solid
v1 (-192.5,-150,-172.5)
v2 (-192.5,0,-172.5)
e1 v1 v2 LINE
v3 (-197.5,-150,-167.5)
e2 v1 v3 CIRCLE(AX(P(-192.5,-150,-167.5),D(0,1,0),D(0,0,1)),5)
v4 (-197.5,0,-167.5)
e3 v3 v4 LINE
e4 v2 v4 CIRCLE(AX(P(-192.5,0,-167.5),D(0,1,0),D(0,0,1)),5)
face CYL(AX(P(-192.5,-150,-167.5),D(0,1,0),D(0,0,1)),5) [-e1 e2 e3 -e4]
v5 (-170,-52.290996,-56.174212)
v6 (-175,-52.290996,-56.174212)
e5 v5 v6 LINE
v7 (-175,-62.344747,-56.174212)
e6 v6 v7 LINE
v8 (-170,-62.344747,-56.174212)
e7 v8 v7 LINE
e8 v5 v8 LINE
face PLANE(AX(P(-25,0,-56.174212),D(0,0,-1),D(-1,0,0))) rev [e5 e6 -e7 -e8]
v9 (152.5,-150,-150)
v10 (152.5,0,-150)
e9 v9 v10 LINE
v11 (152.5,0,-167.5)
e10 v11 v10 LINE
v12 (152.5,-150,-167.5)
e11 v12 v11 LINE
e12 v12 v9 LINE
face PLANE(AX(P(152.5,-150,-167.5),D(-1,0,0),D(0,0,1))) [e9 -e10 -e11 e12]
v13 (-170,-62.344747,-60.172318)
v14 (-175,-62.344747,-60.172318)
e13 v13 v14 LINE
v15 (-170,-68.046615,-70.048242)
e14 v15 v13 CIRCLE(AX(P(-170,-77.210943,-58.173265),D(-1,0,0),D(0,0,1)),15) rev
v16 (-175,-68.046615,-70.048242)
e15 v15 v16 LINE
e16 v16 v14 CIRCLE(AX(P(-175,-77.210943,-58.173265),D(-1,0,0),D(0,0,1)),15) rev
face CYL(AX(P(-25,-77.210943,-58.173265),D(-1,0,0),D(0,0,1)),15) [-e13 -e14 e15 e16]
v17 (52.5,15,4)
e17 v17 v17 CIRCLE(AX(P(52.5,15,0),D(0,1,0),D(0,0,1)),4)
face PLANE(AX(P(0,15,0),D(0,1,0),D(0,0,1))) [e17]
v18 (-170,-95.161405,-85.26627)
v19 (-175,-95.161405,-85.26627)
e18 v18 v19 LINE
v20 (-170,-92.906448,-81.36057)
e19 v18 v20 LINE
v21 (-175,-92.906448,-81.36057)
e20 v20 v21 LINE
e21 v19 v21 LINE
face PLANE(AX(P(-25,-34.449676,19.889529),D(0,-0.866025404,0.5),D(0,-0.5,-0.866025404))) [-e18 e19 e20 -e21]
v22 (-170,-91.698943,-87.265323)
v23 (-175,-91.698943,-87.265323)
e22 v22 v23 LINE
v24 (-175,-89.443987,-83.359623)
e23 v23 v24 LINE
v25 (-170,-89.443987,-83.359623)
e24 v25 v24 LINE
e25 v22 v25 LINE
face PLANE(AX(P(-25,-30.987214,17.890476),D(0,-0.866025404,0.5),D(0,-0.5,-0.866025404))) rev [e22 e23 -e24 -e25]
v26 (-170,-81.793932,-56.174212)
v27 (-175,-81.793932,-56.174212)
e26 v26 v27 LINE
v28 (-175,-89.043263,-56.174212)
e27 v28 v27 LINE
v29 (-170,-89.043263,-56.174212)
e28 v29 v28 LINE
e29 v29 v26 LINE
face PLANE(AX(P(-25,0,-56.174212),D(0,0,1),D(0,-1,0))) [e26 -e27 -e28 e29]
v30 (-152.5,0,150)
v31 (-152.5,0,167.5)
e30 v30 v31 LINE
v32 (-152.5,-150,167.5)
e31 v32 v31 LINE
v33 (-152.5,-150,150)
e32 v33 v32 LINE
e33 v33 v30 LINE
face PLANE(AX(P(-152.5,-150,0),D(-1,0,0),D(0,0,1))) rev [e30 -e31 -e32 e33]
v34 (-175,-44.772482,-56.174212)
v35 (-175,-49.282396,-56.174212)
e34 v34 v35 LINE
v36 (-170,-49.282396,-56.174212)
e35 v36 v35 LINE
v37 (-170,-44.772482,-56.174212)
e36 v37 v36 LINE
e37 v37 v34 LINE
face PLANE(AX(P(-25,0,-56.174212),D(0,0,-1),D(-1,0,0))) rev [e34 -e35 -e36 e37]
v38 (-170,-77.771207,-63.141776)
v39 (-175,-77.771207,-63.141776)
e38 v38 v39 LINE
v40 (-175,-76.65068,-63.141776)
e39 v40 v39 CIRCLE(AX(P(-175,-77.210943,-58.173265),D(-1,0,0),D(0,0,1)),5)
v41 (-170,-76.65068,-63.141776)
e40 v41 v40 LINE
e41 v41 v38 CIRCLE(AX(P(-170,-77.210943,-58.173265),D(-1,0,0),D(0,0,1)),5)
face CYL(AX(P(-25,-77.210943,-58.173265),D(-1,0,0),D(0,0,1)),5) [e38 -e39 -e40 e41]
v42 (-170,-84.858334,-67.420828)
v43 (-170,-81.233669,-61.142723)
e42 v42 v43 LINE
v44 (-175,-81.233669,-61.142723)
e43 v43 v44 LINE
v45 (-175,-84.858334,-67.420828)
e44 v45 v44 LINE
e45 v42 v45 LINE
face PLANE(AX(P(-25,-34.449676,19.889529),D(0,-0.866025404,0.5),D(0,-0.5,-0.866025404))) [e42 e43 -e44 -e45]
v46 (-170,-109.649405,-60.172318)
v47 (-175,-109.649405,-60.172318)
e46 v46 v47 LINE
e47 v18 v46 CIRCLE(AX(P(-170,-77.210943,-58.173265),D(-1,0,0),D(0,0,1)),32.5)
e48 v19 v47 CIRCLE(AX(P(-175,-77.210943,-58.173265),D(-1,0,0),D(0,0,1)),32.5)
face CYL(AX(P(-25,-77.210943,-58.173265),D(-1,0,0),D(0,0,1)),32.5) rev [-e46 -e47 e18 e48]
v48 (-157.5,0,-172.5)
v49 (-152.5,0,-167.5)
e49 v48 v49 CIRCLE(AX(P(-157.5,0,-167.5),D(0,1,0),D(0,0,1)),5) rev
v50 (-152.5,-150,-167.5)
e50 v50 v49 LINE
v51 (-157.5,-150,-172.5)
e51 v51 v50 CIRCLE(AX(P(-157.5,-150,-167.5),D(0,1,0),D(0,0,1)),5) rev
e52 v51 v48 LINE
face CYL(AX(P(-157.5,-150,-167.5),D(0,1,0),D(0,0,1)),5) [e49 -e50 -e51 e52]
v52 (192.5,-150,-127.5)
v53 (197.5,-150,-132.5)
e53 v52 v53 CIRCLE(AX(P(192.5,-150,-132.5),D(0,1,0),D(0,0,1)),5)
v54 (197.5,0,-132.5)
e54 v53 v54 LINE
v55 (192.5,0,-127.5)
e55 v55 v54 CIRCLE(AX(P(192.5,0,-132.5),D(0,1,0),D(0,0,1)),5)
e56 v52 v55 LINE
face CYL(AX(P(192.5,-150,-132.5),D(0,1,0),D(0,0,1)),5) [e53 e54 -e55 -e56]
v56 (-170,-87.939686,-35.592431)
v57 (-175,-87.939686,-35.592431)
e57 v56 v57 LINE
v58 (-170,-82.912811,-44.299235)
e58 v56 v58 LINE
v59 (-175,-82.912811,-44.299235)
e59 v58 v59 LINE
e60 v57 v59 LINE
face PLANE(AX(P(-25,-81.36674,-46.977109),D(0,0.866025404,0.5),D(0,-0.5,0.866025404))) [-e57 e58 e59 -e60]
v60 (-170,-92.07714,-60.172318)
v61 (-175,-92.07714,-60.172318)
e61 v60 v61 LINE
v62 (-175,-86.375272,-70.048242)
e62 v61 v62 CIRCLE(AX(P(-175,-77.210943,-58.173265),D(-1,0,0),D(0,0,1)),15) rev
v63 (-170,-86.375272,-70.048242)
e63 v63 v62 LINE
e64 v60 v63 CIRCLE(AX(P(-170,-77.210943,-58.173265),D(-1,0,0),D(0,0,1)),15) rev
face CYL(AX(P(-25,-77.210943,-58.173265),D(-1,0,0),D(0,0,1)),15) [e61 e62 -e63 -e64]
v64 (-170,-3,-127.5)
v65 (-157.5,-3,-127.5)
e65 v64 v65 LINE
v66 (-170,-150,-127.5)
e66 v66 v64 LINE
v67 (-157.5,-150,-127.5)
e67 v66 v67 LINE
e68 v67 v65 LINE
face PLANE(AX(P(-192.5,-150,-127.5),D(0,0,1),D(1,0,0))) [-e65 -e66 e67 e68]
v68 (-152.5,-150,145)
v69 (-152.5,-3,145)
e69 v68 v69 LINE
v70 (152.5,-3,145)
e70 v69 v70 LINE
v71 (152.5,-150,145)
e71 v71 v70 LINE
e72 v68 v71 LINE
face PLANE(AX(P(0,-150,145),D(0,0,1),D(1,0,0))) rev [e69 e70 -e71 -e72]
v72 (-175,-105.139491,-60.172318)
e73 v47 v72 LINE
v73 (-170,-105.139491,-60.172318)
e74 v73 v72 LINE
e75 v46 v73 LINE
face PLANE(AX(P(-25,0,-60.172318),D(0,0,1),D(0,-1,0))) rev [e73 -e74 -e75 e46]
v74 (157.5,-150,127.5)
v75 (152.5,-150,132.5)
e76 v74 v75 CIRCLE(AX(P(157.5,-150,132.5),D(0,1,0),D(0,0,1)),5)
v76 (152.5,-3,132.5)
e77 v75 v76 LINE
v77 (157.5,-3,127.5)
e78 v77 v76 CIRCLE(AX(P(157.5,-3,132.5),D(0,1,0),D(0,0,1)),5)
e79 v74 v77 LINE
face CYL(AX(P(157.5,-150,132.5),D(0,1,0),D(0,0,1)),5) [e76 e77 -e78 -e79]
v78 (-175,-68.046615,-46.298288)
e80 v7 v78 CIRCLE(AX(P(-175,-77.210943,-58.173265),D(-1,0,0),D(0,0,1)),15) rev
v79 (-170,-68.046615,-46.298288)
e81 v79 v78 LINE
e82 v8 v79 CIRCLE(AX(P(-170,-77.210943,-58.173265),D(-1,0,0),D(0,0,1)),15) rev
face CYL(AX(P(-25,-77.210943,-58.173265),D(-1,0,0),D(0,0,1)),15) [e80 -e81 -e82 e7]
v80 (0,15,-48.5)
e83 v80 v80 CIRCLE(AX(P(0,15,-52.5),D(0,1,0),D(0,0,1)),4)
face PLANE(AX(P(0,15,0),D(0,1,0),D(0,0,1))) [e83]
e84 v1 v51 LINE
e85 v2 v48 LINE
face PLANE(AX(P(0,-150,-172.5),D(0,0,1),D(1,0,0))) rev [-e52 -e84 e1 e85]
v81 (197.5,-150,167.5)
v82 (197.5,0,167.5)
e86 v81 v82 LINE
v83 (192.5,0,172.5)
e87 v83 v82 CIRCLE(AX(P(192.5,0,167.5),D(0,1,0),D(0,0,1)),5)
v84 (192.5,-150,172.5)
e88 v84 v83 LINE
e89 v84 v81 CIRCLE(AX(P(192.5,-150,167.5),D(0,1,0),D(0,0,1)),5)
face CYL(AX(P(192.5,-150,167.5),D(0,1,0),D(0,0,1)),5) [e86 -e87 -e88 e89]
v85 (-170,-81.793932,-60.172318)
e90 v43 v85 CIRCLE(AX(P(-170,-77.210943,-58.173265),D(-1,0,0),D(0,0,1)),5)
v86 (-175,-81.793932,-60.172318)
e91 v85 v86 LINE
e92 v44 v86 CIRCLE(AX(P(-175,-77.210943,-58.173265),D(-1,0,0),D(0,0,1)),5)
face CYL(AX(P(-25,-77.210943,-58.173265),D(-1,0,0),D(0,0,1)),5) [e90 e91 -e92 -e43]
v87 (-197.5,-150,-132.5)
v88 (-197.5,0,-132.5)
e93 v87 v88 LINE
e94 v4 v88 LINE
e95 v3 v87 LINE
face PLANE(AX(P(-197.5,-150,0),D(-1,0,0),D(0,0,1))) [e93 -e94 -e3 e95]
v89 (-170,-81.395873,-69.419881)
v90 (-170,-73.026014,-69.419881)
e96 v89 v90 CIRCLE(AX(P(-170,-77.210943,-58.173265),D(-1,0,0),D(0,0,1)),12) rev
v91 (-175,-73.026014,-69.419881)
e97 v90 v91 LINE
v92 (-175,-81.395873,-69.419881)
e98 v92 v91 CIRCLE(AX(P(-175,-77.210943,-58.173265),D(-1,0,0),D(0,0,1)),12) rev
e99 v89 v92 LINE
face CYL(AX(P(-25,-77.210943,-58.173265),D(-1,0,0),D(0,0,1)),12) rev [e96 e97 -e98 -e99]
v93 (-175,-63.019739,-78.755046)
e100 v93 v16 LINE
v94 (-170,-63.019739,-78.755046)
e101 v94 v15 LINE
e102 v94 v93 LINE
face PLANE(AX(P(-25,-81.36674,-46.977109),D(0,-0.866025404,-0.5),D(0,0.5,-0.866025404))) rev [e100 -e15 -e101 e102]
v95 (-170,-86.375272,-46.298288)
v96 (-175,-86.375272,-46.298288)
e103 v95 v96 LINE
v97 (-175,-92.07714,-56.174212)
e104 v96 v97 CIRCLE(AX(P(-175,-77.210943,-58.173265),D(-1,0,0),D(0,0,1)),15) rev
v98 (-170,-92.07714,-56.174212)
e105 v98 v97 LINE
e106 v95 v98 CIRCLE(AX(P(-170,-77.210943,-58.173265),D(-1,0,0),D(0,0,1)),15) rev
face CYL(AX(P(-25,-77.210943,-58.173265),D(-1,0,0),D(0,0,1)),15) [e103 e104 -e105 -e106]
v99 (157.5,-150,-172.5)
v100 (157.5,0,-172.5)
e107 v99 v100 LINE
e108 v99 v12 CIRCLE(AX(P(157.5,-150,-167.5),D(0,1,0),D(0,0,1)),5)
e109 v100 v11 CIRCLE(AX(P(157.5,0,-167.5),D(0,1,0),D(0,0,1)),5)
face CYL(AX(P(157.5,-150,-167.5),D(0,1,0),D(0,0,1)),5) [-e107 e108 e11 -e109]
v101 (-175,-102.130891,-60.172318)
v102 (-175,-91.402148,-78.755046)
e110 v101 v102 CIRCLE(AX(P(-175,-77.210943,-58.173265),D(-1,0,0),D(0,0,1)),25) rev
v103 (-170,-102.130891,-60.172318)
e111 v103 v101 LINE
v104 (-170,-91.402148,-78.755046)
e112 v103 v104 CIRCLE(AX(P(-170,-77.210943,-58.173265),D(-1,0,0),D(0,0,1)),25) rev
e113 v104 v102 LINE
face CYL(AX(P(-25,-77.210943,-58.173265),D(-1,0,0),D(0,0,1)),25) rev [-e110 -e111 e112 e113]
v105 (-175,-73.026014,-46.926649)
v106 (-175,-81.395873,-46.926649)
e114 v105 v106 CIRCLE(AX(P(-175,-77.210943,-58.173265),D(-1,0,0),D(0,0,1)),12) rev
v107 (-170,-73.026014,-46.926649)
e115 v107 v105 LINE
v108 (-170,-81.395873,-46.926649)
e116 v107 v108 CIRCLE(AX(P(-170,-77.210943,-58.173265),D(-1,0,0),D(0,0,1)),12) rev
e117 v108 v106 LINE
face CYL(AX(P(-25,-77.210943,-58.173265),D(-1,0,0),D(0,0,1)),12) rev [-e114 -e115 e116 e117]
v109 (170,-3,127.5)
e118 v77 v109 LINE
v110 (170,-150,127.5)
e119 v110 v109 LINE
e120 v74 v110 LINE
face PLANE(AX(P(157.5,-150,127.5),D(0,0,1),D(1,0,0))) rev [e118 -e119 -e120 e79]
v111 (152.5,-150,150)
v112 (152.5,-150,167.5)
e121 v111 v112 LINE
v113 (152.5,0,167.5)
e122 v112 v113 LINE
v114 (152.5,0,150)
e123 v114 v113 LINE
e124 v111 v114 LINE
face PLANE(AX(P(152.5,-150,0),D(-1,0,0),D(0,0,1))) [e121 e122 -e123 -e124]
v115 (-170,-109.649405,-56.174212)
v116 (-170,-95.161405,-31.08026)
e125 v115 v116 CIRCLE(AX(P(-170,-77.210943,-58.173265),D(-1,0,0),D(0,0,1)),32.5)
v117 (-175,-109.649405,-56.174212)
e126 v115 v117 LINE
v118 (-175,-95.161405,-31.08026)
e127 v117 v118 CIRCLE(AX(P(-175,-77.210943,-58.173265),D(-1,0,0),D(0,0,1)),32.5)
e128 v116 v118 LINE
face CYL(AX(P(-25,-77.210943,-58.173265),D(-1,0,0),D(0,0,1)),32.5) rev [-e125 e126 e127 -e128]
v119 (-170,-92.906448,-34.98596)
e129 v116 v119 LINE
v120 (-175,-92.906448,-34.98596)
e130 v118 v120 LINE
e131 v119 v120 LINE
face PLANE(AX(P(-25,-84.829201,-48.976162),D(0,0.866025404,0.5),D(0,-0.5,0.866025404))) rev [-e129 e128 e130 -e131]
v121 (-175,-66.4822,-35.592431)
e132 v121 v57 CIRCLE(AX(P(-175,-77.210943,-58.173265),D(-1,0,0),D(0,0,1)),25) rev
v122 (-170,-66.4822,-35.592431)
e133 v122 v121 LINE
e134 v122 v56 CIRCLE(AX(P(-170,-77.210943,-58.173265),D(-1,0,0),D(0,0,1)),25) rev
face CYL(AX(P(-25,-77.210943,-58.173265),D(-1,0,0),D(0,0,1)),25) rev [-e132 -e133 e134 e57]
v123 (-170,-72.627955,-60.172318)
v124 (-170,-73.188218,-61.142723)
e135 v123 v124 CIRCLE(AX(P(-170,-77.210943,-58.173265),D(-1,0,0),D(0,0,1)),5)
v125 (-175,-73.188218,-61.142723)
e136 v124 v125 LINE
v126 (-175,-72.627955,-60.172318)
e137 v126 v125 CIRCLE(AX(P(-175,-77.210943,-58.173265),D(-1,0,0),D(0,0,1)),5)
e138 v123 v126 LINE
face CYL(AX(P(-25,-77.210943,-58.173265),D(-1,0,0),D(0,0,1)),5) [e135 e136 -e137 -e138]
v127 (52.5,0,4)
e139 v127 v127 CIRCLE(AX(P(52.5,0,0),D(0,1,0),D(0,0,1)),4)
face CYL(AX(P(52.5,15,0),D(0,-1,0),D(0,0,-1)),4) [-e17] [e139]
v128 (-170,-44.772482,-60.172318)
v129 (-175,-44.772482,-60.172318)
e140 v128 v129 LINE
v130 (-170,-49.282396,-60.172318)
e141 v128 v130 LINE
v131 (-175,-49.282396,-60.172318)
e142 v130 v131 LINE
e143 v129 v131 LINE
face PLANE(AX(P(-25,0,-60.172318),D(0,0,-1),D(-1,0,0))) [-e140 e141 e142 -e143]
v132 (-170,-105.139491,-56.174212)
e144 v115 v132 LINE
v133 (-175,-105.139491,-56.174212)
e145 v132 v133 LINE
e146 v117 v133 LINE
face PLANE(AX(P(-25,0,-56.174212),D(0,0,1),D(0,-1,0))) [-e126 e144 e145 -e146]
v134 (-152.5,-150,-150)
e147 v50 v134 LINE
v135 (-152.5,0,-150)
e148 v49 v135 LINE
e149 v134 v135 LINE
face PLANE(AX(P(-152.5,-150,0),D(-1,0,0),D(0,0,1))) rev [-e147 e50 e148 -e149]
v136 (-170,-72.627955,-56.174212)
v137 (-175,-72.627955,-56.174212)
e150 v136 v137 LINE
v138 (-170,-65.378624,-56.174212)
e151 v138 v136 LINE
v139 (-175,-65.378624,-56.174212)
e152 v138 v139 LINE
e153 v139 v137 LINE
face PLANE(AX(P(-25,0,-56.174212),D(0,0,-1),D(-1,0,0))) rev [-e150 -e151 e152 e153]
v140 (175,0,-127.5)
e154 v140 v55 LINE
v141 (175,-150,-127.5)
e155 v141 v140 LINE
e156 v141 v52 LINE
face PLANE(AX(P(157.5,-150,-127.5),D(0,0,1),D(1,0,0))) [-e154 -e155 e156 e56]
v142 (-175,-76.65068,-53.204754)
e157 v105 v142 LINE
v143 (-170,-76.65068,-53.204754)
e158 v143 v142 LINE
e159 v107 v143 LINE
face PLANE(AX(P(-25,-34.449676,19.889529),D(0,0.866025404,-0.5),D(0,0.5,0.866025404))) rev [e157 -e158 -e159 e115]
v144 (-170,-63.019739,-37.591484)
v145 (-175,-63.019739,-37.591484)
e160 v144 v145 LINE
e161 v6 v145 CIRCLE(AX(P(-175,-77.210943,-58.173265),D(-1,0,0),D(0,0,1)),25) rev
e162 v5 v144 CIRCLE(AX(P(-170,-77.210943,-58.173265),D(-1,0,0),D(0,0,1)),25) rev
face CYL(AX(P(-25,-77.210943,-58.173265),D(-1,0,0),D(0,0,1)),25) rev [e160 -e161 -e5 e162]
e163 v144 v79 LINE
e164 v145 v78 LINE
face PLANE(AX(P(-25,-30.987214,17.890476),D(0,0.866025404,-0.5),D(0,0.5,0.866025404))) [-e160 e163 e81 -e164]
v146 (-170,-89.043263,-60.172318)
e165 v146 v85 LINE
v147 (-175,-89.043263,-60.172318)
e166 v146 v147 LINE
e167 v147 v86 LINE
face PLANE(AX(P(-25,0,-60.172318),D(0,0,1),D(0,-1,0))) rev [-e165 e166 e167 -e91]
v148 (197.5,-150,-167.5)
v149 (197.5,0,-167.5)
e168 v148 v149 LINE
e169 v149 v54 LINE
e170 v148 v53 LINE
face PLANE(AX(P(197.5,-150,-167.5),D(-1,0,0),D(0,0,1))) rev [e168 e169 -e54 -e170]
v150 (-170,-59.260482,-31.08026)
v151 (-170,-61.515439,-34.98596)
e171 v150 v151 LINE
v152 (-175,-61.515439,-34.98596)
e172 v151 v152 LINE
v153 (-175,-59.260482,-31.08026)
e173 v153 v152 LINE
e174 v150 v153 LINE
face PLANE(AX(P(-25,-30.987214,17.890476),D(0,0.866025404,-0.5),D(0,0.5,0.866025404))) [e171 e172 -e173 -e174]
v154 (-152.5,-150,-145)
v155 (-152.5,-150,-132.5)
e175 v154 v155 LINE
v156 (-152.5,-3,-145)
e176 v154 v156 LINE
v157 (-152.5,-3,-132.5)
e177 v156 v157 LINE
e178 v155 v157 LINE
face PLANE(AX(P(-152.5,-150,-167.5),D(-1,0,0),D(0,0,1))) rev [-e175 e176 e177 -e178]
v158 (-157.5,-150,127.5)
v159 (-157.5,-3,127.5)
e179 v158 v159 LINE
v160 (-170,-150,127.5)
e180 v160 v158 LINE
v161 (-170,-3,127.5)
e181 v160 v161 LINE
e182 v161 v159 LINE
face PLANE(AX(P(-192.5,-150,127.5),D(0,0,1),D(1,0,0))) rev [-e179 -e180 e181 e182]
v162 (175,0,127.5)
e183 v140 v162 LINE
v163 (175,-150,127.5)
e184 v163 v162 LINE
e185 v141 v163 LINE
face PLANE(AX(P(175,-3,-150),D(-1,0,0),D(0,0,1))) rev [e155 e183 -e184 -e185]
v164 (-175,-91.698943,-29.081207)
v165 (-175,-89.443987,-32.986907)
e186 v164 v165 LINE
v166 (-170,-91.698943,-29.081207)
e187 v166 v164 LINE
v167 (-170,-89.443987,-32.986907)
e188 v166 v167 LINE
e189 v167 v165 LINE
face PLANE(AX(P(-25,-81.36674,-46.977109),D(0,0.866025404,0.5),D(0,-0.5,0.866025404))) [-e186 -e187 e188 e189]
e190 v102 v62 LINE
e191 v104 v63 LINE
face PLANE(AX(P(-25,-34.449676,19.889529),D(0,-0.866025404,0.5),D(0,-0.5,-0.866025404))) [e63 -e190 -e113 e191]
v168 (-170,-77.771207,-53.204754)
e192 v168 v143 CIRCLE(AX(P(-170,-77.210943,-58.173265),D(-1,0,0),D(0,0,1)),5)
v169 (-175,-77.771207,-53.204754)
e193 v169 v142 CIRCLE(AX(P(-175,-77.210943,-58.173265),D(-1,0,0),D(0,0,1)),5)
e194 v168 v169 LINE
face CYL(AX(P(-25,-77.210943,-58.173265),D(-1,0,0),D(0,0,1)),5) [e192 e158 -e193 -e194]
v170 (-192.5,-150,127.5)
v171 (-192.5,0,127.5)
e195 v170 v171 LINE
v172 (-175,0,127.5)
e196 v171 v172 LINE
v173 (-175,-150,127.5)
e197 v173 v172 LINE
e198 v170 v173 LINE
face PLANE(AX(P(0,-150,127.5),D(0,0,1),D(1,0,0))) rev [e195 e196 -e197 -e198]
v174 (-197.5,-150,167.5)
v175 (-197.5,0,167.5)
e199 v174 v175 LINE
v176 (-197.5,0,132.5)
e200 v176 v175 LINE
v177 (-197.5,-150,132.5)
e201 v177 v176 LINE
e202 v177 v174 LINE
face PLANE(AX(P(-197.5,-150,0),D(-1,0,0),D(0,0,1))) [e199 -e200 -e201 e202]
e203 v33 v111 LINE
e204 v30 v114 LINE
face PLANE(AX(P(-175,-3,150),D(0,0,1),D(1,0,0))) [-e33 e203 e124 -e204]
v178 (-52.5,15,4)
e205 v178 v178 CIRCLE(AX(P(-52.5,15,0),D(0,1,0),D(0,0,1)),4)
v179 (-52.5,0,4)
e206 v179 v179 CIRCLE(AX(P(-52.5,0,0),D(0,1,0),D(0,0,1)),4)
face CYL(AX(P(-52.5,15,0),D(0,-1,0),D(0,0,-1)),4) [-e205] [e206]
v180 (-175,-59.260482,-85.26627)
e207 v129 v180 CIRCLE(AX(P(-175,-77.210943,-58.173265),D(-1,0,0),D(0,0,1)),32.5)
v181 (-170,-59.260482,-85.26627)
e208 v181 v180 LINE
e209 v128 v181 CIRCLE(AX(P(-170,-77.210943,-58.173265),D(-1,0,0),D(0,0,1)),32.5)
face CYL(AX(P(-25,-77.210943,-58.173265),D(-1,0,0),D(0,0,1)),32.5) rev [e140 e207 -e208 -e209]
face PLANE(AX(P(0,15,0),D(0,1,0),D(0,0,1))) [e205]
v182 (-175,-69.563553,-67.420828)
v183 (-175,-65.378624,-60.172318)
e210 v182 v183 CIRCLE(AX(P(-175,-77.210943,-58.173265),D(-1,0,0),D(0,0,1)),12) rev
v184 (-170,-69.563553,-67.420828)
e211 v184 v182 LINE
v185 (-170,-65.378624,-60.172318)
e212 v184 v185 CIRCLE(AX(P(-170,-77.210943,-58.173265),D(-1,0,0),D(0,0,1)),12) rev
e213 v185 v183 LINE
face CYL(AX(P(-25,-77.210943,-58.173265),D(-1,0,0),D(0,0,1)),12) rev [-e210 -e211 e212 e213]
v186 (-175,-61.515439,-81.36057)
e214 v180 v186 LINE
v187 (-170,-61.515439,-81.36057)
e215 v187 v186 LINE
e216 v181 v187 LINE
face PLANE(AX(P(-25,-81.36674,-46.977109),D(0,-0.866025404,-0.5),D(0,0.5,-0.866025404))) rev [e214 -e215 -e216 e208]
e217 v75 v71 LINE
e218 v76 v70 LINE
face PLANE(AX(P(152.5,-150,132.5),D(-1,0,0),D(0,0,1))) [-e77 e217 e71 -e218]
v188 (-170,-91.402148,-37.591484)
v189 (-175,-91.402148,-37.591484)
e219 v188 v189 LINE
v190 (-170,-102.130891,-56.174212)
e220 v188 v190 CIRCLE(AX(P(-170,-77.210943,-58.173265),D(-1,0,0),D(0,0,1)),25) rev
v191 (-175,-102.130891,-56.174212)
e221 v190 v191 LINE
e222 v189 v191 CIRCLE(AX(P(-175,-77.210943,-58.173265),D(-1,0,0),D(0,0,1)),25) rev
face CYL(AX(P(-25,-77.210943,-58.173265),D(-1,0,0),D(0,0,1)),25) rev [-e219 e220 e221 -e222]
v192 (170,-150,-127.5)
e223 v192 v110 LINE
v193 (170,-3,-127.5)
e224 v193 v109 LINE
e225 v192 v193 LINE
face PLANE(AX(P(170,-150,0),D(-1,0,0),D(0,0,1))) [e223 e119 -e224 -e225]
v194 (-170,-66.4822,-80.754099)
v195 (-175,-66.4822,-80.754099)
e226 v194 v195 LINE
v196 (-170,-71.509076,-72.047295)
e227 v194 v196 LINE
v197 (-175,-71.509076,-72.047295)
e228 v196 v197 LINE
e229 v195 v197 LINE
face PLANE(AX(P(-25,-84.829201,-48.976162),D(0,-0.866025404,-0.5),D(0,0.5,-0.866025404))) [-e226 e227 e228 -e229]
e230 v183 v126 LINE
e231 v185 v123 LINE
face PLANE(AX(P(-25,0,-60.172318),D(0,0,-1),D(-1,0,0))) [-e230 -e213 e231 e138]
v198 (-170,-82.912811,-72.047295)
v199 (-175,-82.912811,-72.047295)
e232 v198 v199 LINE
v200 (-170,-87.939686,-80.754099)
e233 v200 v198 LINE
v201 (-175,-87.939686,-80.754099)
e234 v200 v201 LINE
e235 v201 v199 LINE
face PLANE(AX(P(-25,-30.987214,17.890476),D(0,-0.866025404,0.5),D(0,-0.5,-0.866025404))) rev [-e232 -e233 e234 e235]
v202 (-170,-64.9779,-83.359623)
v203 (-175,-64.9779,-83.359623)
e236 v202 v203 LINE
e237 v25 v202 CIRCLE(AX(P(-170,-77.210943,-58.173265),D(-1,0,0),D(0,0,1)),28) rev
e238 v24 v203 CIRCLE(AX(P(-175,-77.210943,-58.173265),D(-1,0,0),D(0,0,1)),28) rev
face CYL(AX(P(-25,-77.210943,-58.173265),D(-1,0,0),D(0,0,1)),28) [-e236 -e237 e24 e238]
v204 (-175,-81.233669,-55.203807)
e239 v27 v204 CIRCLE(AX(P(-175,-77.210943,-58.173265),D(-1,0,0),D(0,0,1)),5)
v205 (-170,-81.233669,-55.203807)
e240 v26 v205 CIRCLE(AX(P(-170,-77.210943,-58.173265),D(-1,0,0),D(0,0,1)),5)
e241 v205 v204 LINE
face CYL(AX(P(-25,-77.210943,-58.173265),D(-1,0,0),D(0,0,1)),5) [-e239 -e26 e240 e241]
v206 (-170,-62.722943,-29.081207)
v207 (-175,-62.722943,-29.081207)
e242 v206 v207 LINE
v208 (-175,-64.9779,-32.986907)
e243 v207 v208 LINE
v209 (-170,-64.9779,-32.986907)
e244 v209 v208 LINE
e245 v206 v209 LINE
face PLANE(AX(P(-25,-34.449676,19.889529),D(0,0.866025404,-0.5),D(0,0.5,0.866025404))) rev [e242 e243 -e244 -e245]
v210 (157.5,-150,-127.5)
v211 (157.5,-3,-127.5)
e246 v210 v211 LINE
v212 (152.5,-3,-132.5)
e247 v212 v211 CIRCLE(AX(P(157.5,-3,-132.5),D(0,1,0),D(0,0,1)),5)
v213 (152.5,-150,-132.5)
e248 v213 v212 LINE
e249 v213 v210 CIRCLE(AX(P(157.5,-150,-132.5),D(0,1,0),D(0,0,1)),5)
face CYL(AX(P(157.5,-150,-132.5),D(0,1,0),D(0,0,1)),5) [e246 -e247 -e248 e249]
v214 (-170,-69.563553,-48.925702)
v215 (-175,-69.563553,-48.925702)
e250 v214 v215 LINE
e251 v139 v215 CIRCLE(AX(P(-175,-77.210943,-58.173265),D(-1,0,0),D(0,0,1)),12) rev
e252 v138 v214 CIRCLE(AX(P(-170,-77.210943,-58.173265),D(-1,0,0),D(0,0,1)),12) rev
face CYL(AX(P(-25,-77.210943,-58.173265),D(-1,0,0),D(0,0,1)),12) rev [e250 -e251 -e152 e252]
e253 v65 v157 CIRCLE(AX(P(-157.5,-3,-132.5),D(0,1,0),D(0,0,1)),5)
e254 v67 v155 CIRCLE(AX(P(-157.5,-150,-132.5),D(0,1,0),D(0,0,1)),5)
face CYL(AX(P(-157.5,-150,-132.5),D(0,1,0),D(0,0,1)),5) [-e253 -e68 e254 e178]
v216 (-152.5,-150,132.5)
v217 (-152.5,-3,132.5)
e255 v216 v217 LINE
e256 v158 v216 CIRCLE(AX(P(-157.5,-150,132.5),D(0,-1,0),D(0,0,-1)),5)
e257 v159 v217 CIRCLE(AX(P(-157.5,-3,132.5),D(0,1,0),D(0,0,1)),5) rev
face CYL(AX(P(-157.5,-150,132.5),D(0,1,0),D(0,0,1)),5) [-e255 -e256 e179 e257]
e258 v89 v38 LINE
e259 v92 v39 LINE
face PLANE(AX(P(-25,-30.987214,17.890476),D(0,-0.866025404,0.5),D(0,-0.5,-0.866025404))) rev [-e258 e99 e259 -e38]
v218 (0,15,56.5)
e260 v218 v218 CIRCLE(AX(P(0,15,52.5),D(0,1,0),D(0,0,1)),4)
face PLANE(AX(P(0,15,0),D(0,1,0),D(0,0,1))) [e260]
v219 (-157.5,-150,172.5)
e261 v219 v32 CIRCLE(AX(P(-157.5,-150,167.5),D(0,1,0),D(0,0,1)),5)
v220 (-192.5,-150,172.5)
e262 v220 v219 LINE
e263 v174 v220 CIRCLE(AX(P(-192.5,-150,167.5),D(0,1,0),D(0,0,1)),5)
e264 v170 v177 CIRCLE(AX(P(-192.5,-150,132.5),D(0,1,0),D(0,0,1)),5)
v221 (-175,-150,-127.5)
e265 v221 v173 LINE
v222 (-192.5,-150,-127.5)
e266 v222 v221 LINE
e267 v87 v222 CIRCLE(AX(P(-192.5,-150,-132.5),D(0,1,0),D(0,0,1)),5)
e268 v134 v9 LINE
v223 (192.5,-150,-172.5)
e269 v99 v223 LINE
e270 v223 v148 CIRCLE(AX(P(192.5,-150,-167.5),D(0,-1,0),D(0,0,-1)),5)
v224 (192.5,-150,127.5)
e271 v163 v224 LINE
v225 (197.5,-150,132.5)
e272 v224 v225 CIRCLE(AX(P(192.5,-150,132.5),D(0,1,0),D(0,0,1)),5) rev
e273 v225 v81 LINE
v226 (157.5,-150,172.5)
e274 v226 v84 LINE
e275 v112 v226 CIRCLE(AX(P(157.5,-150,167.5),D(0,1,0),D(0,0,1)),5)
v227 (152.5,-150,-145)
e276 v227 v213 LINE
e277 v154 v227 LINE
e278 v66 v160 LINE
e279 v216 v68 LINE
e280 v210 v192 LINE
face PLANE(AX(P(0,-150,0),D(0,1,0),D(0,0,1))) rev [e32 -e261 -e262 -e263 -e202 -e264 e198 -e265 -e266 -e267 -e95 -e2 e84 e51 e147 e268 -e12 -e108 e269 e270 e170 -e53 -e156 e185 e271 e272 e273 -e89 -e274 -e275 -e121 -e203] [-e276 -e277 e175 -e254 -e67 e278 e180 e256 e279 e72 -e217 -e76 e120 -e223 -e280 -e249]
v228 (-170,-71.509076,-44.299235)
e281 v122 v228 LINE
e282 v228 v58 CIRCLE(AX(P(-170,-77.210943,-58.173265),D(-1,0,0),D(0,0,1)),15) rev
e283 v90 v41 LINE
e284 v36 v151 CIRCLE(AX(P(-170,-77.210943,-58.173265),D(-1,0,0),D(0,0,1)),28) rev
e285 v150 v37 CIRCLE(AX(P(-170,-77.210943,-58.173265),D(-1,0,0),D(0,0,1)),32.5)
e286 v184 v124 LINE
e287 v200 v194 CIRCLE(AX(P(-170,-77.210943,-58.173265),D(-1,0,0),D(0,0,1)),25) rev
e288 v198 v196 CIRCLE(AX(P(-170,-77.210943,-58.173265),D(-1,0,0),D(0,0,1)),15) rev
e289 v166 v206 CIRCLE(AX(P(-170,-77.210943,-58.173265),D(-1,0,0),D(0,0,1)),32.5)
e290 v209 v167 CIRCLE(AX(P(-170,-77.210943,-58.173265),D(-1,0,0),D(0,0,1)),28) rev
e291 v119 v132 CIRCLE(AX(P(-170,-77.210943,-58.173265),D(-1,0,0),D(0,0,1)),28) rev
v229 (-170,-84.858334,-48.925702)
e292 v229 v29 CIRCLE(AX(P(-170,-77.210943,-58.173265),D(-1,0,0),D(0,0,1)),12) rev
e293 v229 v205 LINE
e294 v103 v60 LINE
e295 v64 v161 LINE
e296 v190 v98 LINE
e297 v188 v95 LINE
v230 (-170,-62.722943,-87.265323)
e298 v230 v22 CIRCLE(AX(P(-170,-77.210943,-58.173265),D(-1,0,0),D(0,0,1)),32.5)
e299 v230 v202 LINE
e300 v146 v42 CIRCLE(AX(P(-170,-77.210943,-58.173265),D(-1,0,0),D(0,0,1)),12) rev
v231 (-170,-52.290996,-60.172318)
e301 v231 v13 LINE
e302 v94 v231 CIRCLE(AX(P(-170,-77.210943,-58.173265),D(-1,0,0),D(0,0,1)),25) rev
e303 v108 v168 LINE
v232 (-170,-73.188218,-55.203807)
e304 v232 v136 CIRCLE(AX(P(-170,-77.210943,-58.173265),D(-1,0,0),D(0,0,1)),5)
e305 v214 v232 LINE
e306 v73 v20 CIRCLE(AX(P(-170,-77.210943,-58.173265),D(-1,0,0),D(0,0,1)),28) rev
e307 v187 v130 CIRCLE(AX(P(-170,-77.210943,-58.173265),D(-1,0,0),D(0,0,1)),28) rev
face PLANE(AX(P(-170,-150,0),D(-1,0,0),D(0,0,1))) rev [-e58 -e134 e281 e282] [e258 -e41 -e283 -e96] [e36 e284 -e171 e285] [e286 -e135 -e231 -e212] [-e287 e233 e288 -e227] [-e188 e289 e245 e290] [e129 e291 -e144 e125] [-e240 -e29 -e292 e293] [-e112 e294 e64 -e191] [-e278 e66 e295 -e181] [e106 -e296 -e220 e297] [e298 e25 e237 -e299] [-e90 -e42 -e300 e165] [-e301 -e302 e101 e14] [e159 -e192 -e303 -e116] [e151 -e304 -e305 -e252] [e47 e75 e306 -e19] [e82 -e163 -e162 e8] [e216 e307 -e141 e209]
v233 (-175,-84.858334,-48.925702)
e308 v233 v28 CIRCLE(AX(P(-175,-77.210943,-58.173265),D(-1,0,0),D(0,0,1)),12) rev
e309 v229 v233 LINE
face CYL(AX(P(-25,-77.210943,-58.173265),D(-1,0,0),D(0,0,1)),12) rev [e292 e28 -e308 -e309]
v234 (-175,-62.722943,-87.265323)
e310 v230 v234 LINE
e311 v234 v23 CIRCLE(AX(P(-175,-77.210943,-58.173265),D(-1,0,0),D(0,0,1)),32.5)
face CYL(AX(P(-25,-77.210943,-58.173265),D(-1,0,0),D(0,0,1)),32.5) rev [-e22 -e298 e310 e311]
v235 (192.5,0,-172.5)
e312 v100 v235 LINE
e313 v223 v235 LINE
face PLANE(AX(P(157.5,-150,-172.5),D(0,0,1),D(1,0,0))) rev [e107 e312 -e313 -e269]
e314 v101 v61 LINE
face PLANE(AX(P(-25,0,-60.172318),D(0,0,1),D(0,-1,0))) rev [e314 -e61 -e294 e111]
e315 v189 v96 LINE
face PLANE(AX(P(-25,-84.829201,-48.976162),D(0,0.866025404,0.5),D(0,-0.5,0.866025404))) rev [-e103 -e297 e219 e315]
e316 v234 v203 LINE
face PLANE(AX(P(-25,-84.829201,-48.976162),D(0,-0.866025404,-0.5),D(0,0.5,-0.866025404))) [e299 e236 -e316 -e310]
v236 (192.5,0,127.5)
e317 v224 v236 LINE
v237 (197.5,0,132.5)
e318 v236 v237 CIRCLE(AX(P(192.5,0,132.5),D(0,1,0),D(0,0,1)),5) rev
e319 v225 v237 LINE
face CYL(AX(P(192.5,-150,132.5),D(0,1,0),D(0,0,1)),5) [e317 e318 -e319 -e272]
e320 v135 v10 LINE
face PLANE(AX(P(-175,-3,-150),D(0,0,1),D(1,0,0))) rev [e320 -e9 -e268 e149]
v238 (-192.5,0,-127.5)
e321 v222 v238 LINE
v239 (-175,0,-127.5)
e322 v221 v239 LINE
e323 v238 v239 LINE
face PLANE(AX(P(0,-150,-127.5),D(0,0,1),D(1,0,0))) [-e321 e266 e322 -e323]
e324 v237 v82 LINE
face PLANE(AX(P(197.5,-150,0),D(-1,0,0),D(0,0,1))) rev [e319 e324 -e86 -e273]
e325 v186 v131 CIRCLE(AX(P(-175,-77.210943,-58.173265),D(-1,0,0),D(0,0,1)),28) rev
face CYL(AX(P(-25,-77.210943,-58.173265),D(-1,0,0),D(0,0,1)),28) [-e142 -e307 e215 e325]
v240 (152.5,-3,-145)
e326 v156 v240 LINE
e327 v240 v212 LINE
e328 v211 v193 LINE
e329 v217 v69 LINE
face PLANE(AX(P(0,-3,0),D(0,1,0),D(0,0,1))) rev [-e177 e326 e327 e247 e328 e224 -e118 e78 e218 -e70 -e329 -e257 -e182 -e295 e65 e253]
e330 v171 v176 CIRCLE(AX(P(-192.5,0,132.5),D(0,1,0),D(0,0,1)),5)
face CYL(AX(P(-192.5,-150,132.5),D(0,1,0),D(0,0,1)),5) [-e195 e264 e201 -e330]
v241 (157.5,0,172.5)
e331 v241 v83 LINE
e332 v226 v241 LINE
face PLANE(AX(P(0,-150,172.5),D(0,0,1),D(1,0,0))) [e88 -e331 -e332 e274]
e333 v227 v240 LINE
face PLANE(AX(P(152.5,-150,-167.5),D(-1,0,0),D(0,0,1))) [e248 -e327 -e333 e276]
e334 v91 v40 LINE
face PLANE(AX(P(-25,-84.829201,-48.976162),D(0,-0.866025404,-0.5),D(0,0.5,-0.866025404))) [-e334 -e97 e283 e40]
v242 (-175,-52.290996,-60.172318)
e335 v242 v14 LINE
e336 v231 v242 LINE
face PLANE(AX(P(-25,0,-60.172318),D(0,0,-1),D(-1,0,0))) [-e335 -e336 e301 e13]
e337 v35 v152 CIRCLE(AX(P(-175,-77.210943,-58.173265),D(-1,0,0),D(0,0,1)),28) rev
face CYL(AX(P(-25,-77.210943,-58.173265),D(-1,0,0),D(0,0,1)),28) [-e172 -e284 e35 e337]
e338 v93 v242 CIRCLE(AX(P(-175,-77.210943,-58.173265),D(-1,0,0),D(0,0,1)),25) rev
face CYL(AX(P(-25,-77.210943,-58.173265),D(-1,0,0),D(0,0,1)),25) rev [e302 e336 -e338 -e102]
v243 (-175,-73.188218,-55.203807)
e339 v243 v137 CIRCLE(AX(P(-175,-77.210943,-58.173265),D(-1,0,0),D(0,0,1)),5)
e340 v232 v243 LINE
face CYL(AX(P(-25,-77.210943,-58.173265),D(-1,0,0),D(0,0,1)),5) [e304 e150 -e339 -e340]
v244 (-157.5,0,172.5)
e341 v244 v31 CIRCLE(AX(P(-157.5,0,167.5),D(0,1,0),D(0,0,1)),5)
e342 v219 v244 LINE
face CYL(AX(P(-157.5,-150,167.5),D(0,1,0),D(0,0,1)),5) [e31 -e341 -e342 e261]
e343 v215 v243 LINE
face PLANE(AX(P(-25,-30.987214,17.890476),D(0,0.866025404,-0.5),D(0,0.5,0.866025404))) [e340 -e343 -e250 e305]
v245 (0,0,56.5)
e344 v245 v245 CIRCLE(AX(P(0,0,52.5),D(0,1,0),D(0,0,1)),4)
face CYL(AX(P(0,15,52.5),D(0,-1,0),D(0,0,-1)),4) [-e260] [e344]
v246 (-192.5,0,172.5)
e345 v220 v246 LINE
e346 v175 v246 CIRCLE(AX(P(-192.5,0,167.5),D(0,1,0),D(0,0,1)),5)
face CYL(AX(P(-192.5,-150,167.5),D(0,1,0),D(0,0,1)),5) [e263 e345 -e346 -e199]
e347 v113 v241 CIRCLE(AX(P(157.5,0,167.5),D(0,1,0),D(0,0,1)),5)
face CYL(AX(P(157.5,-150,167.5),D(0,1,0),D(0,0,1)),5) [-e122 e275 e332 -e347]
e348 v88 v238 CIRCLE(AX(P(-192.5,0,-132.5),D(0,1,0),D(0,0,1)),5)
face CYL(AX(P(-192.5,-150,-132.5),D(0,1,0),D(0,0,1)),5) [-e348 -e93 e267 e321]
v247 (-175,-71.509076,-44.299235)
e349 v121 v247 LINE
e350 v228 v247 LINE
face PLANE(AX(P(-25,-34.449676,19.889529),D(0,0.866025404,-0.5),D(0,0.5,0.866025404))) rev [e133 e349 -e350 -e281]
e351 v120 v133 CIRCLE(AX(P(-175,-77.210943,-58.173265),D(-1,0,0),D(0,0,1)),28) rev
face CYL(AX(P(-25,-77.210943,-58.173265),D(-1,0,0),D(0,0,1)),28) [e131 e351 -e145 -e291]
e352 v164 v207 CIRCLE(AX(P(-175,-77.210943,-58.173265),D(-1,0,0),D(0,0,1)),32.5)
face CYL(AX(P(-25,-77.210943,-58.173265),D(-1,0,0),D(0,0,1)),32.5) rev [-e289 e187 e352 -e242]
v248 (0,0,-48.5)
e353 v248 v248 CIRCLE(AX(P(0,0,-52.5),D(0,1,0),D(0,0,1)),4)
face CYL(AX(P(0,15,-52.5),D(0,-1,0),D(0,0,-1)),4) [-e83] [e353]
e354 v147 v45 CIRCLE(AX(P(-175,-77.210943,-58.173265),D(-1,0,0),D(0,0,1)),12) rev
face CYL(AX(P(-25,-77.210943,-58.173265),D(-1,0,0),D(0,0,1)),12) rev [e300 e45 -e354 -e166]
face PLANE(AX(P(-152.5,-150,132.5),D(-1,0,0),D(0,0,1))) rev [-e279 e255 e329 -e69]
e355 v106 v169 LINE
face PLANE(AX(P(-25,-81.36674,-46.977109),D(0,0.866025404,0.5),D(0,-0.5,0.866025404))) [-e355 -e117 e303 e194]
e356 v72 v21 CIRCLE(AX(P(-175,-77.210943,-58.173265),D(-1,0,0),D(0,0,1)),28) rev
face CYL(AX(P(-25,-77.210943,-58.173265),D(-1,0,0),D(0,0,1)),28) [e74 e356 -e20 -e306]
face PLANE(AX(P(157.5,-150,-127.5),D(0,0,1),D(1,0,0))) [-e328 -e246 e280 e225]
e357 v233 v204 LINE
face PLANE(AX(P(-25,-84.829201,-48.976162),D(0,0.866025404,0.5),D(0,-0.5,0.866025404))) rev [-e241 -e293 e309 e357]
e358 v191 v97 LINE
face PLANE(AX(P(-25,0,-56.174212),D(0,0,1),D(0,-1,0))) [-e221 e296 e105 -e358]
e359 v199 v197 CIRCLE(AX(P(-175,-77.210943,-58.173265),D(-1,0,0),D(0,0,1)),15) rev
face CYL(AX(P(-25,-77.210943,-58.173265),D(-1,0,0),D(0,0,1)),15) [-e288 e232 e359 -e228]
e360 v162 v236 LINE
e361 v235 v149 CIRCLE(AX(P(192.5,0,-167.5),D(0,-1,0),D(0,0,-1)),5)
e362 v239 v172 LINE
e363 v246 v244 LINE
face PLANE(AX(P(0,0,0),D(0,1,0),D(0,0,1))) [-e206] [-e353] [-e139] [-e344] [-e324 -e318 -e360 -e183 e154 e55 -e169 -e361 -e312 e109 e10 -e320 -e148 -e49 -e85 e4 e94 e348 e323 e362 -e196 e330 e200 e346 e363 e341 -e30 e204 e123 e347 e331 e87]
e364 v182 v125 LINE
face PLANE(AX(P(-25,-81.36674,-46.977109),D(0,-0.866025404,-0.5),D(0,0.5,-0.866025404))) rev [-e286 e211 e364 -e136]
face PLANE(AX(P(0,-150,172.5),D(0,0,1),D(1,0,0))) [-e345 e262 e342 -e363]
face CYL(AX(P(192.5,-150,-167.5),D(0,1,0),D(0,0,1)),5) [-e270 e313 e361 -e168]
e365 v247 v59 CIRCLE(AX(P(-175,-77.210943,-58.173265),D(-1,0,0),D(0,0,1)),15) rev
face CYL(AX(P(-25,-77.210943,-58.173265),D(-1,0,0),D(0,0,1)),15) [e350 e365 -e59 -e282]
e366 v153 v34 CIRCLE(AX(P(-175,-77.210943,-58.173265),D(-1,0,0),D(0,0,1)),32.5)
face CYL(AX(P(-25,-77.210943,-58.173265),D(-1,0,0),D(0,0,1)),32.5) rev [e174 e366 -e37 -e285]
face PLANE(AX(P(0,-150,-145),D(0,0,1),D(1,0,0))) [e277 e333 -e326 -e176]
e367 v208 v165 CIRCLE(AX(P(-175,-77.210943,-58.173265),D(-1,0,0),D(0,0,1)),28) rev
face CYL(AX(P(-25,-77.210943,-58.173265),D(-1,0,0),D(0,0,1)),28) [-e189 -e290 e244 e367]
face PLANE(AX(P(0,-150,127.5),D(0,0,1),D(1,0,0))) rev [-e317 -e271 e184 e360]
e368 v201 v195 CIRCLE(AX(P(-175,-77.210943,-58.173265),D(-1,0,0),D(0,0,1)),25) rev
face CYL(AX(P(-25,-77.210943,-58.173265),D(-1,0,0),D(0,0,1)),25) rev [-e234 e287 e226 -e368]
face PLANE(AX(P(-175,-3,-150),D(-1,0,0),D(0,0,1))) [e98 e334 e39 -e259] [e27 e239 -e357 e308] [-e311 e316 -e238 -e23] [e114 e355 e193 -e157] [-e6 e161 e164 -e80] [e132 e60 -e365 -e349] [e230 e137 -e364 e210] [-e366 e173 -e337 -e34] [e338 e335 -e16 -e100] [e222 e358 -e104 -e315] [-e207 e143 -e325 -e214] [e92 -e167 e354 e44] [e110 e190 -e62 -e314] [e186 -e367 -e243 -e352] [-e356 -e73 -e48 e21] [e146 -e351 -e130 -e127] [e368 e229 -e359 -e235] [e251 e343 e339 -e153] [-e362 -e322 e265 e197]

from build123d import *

# Parameters (mm, degrees)
SKETCH1_W           = 350
SKETCH1_H           = 300
BOSS_EXTRUDE1_DEPTH = 3
SKETCH1_3_R         = 4
BOSS_EXTRUDE2_DEPTH = 15
BOSS_EXTRUDE3_DEPTH = 150
CUT_EXTRUDE1_DEPTH  = 150


with BuildPart() as part:
    # Sketch1 → Boss-Extrude1 (new body)
    with BuildSketch(Plane(origin=(0, 0, 0), x_dir=(1, 0, 0), z_dir=(0, 1, 0))):
        Rectangle(SKETCH1_W, SKETCH1_H)
    extrude(amount=-BOSS_EXTRUDE1_DEPTH)

    # Sketch1<3> → Boss-Extrude2 (add)
    with BuildSketch(Plane(origin=(0, 0, 0), x_dir=(1, 0, 0), z_dir=(0, 1, 0))):
        with Locations((0, 52.5)):
            Circle(SKETCH1_3_R)
        with Locations((0, -52.5)):
            Circle(SKETCH1_3_R)
        with Locations((52.5, 0)):
            Circle(SKETCH1_3_R)
        with Locations((-52.5, 0)):
            Circle(SKETCH1_3_R)
    extrude(amount=BOSS_EXTRUDE2_DEPTH)

    # Sketch1<4> → Boss-Extrude3 (add)
    with BuildSketch(Plane(origin=(0, 0, 0), x_dir=(1, 0, 0), z_dir=(0, 1, 0))):
        with BuildLine():
            Line((-192.5, 127.5), (-175, 127.5))
            Line((-175, 127.5), (-175, -127.5))
            Line((-175, -127.5), (-192.5, -127.5))
            ThreePointArc((-192.5, -127.5), (-196.035533906, -128.964466094), (-197.5, -132.5))
            Line((-197.5, -132.5), (-197.5, -167.5))
            ThreePointArc((-197.5, -167.5), (-196.035533906, -171.035533906), (-192.5, -172.5))
            Line((-192.5, -172.5), (-157.5, -172.5))
            ThreePointArc((-157.5, -172.5), (-153.964466094, -171.035533906), (-152.5, -167.5))
            Line((-152.5, -167.5), (-152.5, -150))
            Line((-152.5, -150), (152.5, -150))
            Line((152.5, -150), (152.5, -167.5))
            ThreePointArc((152.5, -167.5), (153.964466094, -171.035533906), (157.5, -172.5))
            Line((157.5, -172.5), (192.5, -172.5))
            ThreePointArc((192.5, -172.5), (196.035533906, -171.035533906), (197.5, -167.5))
            Line((197.5, -167.5), (197.5, -132.5))
            ThreePointArc((197.5, -132.5), (196.035533906, -128.964466094), (192.5, -127.5))
            Line((192.5, -127.5), (175, -127.5))
            Line((175, -127.5), (175, 127.5))
            Line((175, 127.5), (192.5, 127.5))
            ThreePointArc((192.5, 127.5), (196.035533906, 128.964466094), (197.5, 132.5))
            Line((197.5, 132.5), (197.5, 167.5))
            ThreePointArc((197.5, 167.5), (196.035533906, 171.035533906), (192.5, 172.5))
            Line((192.5, 172.5), (157.5, 172.5))
            ThreePointArc((157.5, 172.5), (153.964466094, 171.035533906), (152.5, 167.5))
            Line((152.5, 167.5), (152.5, 150))
            Line((152.5, 150), (-152.5, 150))
            Line((-152.5, 150), (-152.5, 167.5))
            ThreePointArc((-152.5, 167.5), (-153.964466094, 171.035533906), (-157.5, 172.5))
            Line((-157.5, 172.5), (-192.5, 172.5))
            ThreePointArc((-192.5, 172.5), (-196.035533906, 171.035533906), (-197.5, 167.5))
            Line((-197.5, 167.5), (-197.5, 132.5))
            ThreePointArc((-197.5, 132.5), (-196.035533906, 128.964466094), (-192.5, 127.5))
        make_face()
        with BuildLine():
            Line((-170, -127.5), (-170, 127.5))
            Line((-170, 127.5), (-157.5, 127.5))
            ThreePointArc((-157.5, 127.5), (-153.964466094, 128.964466094), (-152.5, 132.5))
            Line((-152.5, 132.5), (-152.5, 145))
            Line((-152.5, 145), (152.5, 145))
            Line((152.5, 145), (152.5, 132.5))
            ThreePointArc((152.5, 132.5), (153.964466094, 128.964466094), (157.5, 127.5))
            Line((157.5, 127.5), (170, 127.5))
            Line((170, 127.5), (170, -127.5))
            Line((170, -127.5), (157.5, -127.5))
            ThreePointArc((157.5, -127.5), (153.964466094, -128.964466094), (152.5, -132.5))
            Line((152.5, -132.5), (152.5, -145))
            Line((152.5, -145), (-152.5, -145))
            Line((-152.5, -145), (-152.5, -132.5))
            ThreePointArc((-152.5, -132.5), (-153.964466094, -128.964466094), (-157.5, -127.5))
            Line((-157.5, -127.5), (-170, -127.5))
        make_face(mode=Mode.SUBTRACT)
    extrude(amount=-BOSS_EXTRUDE3_DEPTH)

    # Sketch3 → Cut-Extrude1 (cut)
    with BuildSketch(Plane.ZY.offset(175)):
        with BuildLine():
            ThreePointArc((-60.172318038, -44.772481883), (-74.423265007, -49.065117798), (-85.266270244, -59.260481944))
            Line((-85.266270244, -59.260481944), (-81.360570452, -61.515438771))
            ThreePointArc((-81.360570452, -61.515438771), (-72.173265007, -52.962232115), (-60.172318038, -49.282395536))
            Line((-60.172318038, -49.282395536), (-60.172318038, -44.772481883))
        make_face()
        with BuildLine():
            Line((-83.359623482, -64.977900186), (-87.265323275, -62.72294336))
            ThreePointArc((-87.265323275, -62.72294336), (-90.673265007, -77.210943421), (-87.265323275, -91.698943483))
            Line((-87.265323275, -91.698943483), (-83.359623482, -89.443986656))
            ThreePointArc((-83.359623482, -89.443986656), (-86.173265007, -77.210943421), (-83.359623482, -64.977900186))
        make_face()
        with BuildLine():
            ThreePointArc((-60.172318038, -52.290995849), (-70.673265007, -55.560308327), (-78.75504615, -63.019738928))
            Line((-78.75504615, -63.019738928), (-70.048241987, -68.046614655))
            ThreePointArc((-70.048241987, -68.046614655), (-65.673265007, -64.220562364), (-60.172318038, -62.344747304))
            Line((-60.172318038, -62.344747304), (-60.172318038, -52.290995849))
        make_face()
        with BuildLine():
            ThreePointArc((-31.080259771, -59.260481944), (-41.923265007, -49.065117798), (-56.174211977, -44.772481883))
            Line((-56.174211977, -44.772481883), (-56.174211977, -49.282395536))
            ThreePointArc((-56.174211977, -49.282395536), (-44.173265007, -52.962232115), (-34.985959563, -61.515438771))
            Line((-34.985959563, -61.515438771), (-31.080259771, -59.260481944))
        make_face()
        with BuildLine():
            Line((-72.047295017, -71.50907607), (-80.754099181, -66.482200343))
            ThreePointArc((-80.754099181, -66.482200343), (-83.173265007, -77.210943421), (-80.754099181, -87.939686499))
            Line((-80.754099181, -87.939686499), (-72.047295017, -82.912810772))
            ThreePointArc((-72.047295017, -82.912810772), (-73.173265007, -77.210943421), (-72.047295017, -71.50907607))
        make_face()
        with BuildLine():
            Line((-81.360570452, -92.906448072), (-85.266270244, -95.161404898))
            ThreePointArc((-85.266270244, -95.161404898), (-74.423265007, -105.356769044), (-60.172318038, -109.64940496))
            Line((-60.172318038, -109.64940496), (-60.172318038, -105.139491306))
            ThreePointArc((-60.172318038, -105.139491306), (-72.173265007, -101.459654727), (-81.360570452, -92.906448072))
        make_face()
        with BuildLine():
            ThreePointArc((-60.172318038, -65.378623827), (-64.173265007, -66.818638576), (-67.420827847, -69.563552916))
            Line((-67.420827847, -69.563552916), (-61.142723279, -73.188218278))
            ThreePointArc((-61.142723279, -73.188218278), (-60.673265007, -72.880816402), (-60.172318038, -72.627954551))
            Line((-60.172318038, -72.627954551), (-60.172318038, -65.378623827))
        make_face()
        with BuildLine():
            ThreePointArc((-37.591483864, -63.019738928), (-45.673265007, -55.560308327), (-56.174211977, -52.290995849))
            Line((-56.174211977, -52.290995849), (-56.174211977, -62.344747304))
            ThreePointArc((-56.174211977, -62.344747304), (-50.673265007, -64.220562364), (-46.298288028, -68.046614655))
            Line((-46.298288028, -68.046614655), (-37.591483864, -63.019738928))
        make_face()
        with BuildLine():
            ThreePointArc((-29.08120674, -91.698943483), (-25.673265007, -77.210943421), (-29.08120674, -62.72294336))
            Line((-29.08120674, -62.72294336), (-32.986906533, -64.977900186))
            ThreePointArc((-32.986906533, -64.977900186), (-30.173265007, -77.210943421), (-32.986906533, -89.443986656))
            Line((-32.986906533, -89.443986656), (-29.08120674, -91.698943483))
        make_face()
        with BuildLine():
            Line((-63.141776309, -76.650679694), (-69.419880877, -73.026014332))
            ThreePointArc((-69.419880877, -73.026014332), (-70.173265007, -77.210943421), (-69.419880877, -81.395872511))
            Line((-69.419880877, -81.395872511), (-63.141776309, -77.771207148))
            ThreePointArc((-63.141776309, -77.771207148), (-63.173265007, -77.210943421), (-63.141776309, -76.650679694))
        make_face()
        with BuildLine():
            Line((-70.048241987, -86.375272187), (-78.75504615, -91.402147915))
            ThreePointArc((-78.75504615, -91.402147915), (-70.673265007, -98.861578516), (-60.172318038, -102.130890993))
            Line((-60.172318038, -102.130890993), (-60.172318038, -92.077139538))
            ThreePointArc((-60.172318038, -92.077139538), (-65.673265007, -90.201324478), (-70.048241987, -86.375272187))
        make_face()
        with BuildLine():
            Line((-56.174211977, -105.139491306), (-56.174211977, -109.64940496))
            ThreePointArc((-56.174211977, -109.64940496), (-41.923265007, -105.356769044), (-31.080259771, -95.161404898))
            Line((-31.080259771, -95.161404898), (-34.985959563, -92.906448072))
            ThreePointArc((-34.985959563, -92.906448072), (-44.173265007, -101.459654727), (-56.174211977, -105.139491306))
        make_face()
        with BuildLine():
            ThreePointArc((-48.925702168, -69.563552916), (-52.173265007, -66.818638576), (-56.174211977, -65.378623827))
            Line((-56.174211977, -65.378623827), (-56.174211977, -72.627954551))
            ThreePointArc((-56.174211977, -72.627954551), (-55.673265007, -72.880816402), (-55.203806736, -73.188218278))
            Line((-55.203806736, -73.188218278), (-48.925702168, -69.563552916))
        make_face()
        with BuildLine():
            ThreePointArc((-35.592430834, -87.939686499), (-33.173265007, -77.210943421), (-35.592430834, -66.482200343))
            Line((-35.592430834, -66.482200343), (-44.299234997, -71.50907607))
            ThreePointArc((-44.299234997, -71.50907607), (-43.173265007, -77.210943421), (-44.299234997, -82.912810772))
            Line((-44.299234997, -82.912810772), (-35.592430834, -87.939686499))
        make_face()
        with BuildLine():
            Line((-61.142723279, -81.233668564), (-67.420827847, -84.858333926))
            ThreePointArc((-67.420827847, -84.858333926), (-64.173265007, -87.603248267), (-60.172318038, -89.043263015))
            Line((-60.172318038, -89.043263015), (-60.172318038, -81.793932291))
            ThreePointArc((-60.172318038, -81.793932291), (-60.673265007, -81.54107044), (-61.142723279, -81.233668564))
        make_face()
        with BuildLine():
            Line((-56.174211977, -92.077139538), (-56.174211977, -102.130890993))
            ThreePointArc((-56.174211977, -102.130890993), (-45.673265007, -98.861578516), (-37.591483864, -91.402147915))
            Line((-37.591483864, -91.402147915), (-46.298288028, -86.375272187))
            ThreePointArc((-46.298288028, -86.375272187), (-50.673265007, -90.201324478), (-56.174211977, -92.077139538))
        make_face()
        with BuildLine():
            ThreePointArc((-46.926649138, -81.395872511), (-46.173265007, -77.210943421), (-46.926649138, -73.026014332))
            Line((-46.926649138, -73.026014332), (-53.204753706, -76.650679694))
            ThreePointArc((-53.204753706, -76.650679694), (-53.173265007, -77.210943421), (-53.204753706, -77.771207148))
            Line((-53.204753706, -77.771207148), (-46.926649138, -81.395872511))
        make_face()
        with BuildLine():
            Line((-56.174211977, -81.793932291), (-56.174211977, -89.043263015))
            ThreePointArc((-56.174211977, -89.043263015), (-52.173265007, -87.603248267), (-48.925702168, -84.858333926))
            Line((-48.925702168, -84.858333926), (-55.203806736, -81.233668564))
            ThreePointArc((-55.203806736, -81.233668564), (-55.673265007, -81.54107044), (-56.174211977, -81.793932291))
        make_face()
    extrude(amount=-CUT_EXTRUDE1_DEPTH, mode=Mode.SUBTRACT)


solid = part.part
